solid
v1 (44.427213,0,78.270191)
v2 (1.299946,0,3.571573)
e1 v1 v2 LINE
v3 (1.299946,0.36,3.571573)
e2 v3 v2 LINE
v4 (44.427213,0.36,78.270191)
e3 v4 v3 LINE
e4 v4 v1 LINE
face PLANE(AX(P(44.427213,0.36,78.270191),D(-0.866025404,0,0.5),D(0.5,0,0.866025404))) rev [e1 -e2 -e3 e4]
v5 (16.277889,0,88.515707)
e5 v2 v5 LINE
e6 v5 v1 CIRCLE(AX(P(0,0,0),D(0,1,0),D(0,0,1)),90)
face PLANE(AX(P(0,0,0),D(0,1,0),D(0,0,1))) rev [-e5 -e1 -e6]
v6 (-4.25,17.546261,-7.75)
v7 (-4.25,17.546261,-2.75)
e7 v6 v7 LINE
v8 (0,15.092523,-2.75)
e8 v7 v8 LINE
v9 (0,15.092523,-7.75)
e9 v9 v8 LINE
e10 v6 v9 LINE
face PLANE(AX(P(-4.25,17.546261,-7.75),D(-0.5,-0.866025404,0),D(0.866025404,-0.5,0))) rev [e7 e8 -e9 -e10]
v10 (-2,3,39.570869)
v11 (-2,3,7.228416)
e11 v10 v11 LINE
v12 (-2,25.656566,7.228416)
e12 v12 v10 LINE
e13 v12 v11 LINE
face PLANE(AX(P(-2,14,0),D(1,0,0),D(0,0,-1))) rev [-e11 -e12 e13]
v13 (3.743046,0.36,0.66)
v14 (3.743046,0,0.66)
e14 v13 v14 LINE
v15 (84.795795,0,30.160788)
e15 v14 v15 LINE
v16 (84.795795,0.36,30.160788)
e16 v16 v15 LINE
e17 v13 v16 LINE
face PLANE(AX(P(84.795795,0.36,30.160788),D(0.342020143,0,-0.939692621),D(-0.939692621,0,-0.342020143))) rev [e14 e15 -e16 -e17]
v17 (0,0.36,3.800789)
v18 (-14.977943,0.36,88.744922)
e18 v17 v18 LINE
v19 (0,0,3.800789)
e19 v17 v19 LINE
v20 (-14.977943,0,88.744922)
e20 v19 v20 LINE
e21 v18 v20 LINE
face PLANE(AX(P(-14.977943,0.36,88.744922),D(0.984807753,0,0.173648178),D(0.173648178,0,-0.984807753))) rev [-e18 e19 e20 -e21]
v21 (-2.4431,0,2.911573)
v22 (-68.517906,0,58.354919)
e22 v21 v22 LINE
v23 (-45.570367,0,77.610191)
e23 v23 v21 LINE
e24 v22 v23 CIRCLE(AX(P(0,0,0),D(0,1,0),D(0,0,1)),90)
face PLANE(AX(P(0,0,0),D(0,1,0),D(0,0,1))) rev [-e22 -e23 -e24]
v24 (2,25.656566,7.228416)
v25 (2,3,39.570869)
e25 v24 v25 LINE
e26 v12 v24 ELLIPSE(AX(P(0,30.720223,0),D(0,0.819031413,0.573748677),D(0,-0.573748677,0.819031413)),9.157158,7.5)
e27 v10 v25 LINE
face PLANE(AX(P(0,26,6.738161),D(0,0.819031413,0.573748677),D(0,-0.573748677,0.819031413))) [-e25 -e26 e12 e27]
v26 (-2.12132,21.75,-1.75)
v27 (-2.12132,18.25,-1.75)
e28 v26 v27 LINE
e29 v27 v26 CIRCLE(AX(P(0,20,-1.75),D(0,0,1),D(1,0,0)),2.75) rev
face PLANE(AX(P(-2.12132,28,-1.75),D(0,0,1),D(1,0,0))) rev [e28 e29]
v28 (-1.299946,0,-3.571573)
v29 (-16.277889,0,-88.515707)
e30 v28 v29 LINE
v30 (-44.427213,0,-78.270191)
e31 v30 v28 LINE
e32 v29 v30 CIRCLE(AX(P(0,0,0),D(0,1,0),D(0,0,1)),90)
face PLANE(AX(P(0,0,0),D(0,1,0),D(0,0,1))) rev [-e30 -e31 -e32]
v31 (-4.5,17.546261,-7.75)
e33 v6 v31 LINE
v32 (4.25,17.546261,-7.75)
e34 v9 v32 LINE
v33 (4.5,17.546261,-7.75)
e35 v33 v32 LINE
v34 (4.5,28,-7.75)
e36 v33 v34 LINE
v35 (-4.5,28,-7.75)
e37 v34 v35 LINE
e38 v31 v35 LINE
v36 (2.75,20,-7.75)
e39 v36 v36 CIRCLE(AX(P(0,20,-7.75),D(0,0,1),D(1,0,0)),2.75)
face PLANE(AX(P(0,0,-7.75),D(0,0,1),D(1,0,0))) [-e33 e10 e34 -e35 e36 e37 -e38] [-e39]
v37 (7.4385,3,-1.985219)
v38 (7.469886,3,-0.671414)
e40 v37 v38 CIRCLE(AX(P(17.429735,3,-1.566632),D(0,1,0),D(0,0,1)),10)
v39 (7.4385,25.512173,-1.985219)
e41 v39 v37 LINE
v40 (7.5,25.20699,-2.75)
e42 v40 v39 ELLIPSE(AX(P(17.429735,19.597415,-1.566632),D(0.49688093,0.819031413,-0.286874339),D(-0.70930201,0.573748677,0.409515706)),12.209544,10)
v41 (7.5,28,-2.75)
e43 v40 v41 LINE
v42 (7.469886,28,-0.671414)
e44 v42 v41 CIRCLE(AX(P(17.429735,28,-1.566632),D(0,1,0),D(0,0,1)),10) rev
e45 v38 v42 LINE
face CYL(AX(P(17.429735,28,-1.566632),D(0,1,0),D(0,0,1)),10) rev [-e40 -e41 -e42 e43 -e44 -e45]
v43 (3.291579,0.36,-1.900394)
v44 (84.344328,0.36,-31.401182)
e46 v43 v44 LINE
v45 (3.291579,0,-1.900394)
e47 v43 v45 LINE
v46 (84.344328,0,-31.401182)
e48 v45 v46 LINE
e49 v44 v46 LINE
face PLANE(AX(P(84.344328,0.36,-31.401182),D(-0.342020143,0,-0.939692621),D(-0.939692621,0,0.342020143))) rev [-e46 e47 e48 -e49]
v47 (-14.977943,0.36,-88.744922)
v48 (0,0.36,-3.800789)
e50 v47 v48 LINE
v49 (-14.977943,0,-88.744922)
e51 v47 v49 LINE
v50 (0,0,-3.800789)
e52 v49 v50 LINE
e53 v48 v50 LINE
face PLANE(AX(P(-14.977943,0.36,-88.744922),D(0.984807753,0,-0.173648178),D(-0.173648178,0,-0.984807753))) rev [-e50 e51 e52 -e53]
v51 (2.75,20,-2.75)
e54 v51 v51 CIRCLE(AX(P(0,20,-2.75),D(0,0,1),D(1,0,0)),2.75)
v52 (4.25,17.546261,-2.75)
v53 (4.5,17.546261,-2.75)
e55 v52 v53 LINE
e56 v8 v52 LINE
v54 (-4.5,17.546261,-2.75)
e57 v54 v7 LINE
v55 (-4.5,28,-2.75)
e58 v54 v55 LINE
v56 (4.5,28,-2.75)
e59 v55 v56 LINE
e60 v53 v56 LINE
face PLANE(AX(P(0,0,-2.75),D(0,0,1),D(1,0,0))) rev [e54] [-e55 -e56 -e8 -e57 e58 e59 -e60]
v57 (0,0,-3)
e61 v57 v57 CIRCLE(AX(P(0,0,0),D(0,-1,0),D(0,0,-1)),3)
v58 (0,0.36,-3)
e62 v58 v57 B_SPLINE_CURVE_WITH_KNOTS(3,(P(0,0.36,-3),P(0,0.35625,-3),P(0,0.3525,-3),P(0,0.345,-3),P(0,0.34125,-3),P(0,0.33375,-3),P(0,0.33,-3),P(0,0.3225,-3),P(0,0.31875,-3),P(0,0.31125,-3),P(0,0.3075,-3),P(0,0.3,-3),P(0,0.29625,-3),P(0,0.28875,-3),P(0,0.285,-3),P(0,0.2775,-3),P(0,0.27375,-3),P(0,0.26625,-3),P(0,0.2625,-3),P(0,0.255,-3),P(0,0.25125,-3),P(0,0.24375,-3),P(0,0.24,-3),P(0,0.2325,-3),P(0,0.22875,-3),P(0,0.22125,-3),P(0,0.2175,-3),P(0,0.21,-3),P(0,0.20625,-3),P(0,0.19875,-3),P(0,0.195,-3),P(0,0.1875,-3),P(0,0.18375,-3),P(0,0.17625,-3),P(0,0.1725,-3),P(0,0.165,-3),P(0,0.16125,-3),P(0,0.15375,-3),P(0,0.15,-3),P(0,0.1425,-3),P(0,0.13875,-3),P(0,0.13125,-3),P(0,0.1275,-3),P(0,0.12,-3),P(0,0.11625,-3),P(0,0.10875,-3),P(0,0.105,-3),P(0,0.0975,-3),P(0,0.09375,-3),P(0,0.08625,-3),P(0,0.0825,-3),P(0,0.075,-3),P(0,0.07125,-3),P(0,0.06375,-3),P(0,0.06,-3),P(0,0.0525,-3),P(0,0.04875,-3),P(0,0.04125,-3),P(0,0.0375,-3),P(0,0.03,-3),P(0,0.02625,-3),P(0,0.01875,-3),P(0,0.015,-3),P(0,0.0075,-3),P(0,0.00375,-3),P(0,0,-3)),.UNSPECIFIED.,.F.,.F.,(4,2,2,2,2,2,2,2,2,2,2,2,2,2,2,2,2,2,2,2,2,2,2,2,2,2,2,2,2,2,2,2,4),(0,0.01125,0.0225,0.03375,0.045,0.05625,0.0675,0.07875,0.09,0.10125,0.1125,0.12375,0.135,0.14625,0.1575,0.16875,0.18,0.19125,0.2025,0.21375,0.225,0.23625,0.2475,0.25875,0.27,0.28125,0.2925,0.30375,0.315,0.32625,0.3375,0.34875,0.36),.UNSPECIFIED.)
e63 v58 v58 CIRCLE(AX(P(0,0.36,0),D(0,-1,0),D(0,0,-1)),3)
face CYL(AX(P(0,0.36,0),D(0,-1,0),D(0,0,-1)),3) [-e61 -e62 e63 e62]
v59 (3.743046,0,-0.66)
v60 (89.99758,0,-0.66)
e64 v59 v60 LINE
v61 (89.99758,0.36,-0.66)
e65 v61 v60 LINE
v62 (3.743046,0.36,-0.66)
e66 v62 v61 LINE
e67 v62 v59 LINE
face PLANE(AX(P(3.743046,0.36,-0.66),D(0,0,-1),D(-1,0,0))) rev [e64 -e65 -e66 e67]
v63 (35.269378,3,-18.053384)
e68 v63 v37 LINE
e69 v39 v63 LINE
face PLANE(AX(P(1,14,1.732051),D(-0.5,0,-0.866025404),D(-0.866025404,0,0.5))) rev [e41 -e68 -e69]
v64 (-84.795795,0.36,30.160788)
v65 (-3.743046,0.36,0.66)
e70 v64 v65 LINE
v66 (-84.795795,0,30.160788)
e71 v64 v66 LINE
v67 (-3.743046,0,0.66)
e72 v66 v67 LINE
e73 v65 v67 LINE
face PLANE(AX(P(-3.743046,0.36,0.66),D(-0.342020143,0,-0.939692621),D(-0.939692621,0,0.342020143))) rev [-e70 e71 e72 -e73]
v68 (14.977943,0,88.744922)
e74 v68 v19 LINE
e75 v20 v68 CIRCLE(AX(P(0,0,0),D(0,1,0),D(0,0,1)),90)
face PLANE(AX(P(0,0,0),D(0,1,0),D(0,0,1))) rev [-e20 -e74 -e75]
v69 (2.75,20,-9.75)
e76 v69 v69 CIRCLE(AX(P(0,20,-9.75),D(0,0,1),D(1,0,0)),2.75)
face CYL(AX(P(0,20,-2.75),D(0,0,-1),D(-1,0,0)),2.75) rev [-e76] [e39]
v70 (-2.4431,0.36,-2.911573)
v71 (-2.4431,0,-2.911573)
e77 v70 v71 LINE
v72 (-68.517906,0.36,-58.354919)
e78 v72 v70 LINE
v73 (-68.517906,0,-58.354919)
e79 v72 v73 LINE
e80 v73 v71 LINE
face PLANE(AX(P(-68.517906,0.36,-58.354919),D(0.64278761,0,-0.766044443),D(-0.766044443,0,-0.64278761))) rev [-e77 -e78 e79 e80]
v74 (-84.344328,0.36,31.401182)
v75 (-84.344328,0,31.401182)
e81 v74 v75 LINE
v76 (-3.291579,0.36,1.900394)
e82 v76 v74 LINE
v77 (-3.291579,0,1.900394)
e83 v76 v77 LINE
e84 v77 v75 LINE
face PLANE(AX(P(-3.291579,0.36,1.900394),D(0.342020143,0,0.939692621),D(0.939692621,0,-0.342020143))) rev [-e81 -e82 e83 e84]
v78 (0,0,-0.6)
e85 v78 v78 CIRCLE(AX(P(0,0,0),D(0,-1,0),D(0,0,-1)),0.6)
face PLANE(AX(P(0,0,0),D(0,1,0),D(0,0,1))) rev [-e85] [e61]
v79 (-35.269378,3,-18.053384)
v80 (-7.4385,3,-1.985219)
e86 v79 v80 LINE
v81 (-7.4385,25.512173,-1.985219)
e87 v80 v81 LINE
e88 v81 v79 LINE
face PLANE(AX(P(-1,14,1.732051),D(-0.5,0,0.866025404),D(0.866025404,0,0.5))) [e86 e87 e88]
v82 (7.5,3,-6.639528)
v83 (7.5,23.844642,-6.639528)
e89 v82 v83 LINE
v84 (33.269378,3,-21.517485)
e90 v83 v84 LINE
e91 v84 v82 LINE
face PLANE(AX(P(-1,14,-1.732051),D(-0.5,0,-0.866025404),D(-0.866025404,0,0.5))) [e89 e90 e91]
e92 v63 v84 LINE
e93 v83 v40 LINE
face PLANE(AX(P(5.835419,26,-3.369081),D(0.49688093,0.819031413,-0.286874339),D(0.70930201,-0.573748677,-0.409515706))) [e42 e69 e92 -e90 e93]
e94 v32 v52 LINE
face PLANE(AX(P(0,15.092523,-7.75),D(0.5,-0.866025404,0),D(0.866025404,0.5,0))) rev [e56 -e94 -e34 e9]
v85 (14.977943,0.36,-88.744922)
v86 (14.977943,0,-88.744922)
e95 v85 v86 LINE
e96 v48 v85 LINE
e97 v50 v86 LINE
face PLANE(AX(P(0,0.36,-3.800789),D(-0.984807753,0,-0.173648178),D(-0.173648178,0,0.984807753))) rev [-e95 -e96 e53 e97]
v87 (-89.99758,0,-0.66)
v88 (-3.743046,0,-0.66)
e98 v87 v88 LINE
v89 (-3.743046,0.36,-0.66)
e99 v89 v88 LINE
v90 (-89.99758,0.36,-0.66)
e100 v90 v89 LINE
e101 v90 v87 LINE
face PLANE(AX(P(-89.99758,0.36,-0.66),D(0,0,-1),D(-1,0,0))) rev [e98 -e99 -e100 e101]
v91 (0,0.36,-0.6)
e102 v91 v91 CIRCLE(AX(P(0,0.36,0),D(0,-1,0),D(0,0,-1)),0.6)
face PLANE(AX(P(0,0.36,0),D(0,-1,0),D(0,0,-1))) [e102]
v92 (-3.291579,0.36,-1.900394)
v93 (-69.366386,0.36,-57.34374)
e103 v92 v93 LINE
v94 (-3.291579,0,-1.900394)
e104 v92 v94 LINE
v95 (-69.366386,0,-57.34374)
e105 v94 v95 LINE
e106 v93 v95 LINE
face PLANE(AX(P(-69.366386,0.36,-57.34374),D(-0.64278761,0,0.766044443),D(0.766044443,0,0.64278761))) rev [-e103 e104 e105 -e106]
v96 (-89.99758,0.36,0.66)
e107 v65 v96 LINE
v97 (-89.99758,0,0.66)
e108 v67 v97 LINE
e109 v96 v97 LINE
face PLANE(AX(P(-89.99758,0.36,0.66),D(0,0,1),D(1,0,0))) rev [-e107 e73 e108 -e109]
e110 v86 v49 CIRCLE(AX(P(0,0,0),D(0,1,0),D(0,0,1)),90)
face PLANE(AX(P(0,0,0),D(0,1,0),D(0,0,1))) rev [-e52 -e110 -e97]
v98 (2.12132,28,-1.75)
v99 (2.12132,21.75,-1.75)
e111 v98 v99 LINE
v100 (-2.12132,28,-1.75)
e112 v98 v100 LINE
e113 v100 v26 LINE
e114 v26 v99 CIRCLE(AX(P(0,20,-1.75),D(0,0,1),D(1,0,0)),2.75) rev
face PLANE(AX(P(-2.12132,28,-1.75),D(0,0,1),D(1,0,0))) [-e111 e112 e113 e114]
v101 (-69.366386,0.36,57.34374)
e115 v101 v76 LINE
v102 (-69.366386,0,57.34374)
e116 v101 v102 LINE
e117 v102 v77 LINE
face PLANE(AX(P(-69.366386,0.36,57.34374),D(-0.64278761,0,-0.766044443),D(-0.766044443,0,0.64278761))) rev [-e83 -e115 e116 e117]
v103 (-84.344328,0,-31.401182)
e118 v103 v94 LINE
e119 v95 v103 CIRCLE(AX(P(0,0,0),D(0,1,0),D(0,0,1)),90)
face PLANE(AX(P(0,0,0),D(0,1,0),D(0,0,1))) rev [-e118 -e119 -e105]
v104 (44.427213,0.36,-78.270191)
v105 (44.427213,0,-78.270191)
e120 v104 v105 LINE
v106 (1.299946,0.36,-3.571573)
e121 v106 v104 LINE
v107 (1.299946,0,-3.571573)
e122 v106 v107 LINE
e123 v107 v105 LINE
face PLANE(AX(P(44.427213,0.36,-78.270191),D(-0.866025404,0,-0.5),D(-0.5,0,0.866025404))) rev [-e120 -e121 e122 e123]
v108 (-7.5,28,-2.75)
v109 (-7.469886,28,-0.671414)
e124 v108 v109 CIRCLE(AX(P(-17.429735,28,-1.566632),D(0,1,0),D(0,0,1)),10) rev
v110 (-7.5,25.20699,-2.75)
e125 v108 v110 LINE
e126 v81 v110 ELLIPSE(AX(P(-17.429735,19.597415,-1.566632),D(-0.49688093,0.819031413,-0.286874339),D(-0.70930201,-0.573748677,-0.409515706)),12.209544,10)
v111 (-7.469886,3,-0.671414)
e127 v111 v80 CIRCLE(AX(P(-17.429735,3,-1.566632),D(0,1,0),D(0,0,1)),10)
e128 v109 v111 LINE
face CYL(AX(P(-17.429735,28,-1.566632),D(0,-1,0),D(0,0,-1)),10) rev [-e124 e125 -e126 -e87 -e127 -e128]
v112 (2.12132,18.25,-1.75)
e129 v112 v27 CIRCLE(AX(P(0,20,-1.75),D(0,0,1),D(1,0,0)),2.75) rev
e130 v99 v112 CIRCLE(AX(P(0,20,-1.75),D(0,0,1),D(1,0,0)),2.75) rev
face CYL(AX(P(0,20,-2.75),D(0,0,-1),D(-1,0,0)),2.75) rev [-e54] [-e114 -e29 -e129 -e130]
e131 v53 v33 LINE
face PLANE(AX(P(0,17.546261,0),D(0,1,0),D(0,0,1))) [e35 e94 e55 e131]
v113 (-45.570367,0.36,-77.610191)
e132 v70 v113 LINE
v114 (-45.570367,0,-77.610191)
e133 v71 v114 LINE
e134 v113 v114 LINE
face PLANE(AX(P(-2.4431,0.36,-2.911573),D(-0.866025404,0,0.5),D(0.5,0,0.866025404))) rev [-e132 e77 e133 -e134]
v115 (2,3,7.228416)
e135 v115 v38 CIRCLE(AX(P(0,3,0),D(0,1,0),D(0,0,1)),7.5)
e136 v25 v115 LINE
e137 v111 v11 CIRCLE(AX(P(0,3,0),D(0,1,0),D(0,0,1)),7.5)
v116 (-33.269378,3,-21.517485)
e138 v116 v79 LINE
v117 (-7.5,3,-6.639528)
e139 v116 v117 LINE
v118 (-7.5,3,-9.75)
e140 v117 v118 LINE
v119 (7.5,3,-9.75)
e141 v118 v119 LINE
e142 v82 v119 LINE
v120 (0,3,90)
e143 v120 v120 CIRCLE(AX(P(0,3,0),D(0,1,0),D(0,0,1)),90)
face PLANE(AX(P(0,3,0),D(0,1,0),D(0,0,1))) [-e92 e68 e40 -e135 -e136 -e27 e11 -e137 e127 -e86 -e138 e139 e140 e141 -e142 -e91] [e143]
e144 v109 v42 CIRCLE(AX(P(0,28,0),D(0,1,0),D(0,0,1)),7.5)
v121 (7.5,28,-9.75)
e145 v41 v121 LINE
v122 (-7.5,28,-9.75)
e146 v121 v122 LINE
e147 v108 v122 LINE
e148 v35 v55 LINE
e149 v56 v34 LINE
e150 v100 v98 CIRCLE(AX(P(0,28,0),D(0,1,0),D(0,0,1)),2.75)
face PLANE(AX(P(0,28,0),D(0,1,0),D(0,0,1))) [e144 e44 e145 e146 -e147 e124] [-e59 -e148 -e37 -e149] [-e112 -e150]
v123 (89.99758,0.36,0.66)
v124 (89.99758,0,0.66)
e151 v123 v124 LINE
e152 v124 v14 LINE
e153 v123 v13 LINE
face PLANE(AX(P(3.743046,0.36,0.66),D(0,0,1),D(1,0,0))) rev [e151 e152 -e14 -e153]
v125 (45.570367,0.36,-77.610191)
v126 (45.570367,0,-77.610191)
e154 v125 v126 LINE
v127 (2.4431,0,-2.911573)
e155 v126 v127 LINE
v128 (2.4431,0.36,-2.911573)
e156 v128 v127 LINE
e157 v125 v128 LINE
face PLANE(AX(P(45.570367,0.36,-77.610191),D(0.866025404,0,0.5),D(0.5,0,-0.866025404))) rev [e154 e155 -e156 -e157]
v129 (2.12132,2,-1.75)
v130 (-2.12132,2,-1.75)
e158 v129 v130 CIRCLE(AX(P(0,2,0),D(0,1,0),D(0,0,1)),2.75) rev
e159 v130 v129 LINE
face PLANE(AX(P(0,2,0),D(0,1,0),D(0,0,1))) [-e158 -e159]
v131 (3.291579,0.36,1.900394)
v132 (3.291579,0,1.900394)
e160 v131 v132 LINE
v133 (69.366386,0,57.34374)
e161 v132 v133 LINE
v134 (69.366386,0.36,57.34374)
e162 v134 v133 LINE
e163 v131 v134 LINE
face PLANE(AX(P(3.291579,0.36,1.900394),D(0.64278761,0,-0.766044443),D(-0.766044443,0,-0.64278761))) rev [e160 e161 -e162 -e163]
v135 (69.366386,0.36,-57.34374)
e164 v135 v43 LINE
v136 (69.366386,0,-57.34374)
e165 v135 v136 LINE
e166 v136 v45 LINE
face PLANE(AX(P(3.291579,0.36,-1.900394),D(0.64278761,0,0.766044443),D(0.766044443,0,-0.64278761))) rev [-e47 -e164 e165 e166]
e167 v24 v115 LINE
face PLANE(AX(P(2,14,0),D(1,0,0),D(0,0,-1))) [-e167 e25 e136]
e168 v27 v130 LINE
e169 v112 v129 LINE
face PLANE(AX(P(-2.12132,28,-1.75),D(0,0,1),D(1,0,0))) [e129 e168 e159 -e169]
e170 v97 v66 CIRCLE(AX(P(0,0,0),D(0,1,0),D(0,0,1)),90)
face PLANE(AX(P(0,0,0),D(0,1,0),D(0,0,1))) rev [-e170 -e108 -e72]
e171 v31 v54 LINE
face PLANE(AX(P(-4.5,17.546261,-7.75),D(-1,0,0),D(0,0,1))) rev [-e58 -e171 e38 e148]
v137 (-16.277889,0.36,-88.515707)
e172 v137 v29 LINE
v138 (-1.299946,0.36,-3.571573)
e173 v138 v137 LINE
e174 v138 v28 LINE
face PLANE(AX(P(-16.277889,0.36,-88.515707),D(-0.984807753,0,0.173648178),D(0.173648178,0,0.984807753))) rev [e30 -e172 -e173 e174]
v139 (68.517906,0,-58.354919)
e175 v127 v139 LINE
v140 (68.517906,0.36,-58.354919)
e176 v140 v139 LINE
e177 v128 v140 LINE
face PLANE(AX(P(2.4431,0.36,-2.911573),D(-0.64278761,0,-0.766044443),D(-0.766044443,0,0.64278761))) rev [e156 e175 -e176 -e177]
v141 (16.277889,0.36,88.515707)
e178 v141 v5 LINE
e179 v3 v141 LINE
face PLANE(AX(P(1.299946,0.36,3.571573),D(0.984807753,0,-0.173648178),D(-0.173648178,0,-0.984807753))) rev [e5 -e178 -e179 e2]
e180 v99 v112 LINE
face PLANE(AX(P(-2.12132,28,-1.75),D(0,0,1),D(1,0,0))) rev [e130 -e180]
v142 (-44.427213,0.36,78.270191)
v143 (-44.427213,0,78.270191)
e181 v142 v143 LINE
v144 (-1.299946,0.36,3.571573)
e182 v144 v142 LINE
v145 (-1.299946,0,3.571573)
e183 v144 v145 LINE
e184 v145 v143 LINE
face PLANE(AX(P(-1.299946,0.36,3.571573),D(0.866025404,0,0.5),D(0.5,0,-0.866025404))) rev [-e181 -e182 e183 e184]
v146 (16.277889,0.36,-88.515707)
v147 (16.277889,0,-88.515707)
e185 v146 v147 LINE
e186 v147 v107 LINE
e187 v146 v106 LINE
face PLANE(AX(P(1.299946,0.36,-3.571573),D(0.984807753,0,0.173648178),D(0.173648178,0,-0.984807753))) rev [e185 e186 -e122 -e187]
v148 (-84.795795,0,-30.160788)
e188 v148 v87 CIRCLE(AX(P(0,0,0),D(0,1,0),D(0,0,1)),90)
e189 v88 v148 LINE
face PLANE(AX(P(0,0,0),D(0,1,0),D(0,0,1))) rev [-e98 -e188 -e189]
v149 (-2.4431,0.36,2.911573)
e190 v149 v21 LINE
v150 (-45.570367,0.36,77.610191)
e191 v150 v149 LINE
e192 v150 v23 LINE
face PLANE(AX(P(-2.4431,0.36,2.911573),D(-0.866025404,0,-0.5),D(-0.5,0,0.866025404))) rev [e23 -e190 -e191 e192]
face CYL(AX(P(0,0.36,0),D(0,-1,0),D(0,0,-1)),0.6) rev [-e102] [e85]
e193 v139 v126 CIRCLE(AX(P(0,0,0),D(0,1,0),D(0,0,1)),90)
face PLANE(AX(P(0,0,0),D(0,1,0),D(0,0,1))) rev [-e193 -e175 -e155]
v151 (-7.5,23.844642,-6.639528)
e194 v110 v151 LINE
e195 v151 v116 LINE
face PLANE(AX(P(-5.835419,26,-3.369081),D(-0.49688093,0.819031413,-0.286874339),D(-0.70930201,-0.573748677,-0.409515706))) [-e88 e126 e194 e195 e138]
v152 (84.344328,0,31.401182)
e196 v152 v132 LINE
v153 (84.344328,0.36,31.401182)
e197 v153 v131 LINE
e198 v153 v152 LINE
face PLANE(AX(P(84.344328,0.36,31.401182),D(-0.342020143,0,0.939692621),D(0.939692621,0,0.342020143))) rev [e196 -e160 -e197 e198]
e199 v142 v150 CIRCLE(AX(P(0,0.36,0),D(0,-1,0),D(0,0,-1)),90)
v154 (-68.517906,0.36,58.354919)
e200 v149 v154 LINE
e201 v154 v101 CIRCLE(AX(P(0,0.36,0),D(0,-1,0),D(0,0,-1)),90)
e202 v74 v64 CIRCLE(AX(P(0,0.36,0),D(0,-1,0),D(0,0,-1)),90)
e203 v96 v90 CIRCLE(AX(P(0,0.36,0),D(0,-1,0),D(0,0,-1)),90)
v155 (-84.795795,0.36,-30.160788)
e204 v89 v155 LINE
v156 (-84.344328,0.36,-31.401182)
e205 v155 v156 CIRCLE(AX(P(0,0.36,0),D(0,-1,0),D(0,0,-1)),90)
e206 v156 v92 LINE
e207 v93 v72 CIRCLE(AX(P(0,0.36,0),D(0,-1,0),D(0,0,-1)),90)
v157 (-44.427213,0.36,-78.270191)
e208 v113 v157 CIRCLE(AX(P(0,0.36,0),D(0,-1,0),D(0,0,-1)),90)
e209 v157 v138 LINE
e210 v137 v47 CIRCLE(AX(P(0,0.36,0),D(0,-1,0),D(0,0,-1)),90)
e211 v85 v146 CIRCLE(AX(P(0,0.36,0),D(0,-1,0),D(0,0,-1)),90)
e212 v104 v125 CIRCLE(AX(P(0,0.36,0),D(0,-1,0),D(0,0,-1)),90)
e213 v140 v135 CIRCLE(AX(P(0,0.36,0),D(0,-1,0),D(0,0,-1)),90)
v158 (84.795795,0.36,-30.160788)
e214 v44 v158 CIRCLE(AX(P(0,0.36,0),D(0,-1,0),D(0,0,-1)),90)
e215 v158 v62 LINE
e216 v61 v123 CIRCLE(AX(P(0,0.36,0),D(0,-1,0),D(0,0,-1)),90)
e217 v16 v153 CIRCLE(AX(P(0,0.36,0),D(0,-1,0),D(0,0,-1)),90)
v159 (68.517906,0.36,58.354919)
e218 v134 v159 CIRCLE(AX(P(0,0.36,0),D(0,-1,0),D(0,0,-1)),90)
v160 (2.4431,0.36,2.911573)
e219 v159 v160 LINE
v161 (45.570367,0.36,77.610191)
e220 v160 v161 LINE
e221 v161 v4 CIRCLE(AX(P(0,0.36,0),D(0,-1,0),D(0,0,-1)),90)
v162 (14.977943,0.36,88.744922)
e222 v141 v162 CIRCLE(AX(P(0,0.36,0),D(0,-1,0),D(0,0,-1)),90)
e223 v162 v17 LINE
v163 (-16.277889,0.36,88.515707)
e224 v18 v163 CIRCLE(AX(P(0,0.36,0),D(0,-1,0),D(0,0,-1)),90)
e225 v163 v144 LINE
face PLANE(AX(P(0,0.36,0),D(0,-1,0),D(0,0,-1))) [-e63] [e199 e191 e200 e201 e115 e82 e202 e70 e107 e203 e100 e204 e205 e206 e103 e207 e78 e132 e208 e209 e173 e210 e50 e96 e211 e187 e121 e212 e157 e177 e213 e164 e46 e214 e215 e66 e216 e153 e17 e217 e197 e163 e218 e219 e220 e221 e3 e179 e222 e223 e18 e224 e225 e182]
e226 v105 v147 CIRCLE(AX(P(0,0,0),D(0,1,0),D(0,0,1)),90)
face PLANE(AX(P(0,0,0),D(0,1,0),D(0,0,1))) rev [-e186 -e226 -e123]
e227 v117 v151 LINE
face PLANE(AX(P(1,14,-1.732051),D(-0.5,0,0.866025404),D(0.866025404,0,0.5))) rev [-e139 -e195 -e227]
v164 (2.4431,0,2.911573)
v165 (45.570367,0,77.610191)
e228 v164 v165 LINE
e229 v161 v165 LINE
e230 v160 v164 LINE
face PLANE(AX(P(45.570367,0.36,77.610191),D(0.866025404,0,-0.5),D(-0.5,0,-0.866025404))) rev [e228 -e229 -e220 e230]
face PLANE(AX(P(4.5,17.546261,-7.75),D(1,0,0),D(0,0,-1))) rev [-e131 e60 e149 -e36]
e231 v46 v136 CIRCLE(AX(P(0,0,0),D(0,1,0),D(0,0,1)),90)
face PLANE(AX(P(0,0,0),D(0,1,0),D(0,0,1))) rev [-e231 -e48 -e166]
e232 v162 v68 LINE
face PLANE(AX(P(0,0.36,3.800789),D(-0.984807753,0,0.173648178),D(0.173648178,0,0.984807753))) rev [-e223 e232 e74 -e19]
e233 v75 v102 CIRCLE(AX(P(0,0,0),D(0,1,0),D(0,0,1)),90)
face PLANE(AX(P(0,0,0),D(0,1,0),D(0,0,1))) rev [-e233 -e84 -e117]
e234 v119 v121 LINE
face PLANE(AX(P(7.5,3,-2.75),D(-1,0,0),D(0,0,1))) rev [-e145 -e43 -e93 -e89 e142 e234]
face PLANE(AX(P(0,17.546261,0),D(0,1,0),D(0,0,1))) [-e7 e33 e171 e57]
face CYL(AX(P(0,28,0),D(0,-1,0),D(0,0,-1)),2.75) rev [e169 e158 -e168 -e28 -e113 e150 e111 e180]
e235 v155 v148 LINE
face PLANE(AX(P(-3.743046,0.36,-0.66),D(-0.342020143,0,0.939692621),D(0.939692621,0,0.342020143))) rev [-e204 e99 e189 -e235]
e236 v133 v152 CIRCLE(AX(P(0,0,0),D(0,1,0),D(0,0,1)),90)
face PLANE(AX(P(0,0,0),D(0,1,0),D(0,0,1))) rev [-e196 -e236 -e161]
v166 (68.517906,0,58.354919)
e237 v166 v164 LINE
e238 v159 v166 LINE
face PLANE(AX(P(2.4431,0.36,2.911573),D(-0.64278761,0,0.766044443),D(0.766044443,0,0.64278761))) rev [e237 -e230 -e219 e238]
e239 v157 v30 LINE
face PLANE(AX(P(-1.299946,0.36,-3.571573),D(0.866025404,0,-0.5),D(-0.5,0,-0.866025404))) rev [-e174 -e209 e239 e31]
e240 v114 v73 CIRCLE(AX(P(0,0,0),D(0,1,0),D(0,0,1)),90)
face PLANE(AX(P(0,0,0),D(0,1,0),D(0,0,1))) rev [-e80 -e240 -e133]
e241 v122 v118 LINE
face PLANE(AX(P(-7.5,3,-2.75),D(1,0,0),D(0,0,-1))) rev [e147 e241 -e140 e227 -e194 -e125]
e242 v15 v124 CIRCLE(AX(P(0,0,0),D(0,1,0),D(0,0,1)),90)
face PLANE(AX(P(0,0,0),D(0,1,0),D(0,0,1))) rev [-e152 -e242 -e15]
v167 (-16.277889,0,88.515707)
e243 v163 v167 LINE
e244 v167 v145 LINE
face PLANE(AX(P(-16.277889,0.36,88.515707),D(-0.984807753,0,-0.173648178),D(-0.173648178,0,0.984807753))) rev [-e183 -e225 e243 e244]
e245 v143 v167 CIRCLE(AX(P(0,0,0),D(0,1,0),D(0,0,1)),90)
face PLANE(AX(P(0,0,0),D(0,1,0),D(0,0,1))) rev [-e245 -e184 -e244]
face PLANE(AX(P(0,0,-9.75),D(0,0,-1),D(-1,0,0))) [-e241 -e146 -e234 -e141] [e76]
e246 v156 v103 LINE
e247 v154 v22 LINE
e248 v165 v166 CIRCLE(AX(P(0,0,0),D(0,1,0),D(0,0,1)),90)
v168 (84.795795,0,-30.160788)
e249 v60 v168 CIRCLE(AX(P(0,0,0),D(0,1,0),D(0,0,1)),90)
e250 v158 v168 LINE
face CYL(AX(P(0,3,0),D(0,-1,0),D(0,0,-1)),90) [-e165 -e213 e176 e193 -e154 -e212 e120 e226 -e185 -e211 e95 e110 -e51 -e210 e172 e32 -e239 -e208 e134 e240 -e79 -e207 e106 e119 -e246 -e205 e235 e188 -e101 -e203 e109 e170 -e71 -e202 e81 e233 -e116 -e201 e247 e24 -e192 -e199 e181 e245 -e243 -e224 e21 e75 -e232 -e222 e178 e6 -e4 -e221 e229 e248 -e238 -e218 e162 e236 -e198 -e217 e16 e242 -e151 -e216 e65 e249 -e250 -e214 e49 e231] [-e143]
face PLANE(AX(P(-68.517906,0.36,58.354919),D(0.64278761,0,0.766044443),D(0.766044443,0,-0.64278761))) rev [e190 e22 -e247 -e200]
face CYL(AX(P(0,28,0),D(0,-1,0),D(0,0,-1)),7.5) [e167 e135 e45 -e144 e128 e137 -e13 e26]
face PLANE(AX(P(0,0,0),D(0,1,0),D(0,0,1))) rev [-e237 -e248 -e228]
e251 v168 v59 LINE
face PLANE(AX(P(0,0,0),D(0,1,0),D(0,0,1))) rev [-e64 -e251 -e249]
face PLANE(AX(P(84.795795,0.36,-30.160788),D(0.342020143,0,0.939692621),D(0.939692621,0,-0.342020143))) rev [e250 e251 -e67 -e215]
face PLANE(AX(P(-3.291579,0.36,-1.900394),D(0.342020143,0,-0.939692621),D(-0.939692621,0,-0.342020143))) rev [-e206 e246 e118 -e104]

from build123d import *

# Parameters (mm, degrees)
SKETCH1_R                = 90
BOSS_EXTRUDE1_DEPTH      = 3
SKETCH2_R                = 7.5
BOSS_EXTRUDE2_DEPTH      = 25
RIB5_REACH               = 132.323
SKETCH3_WALL_W           = 306.218438134
SKETCH3_WALL_H           = 4
CIRPATTERN1_COUNT        = 3
BOSS_EXTRUDE3_DEPTH      = 4
BOSS_EXTRUDE3_DEPTH_BACK = 3
BOSS_EXTRUDE3_START      = -5
SKETCH5_W                = 15
SKETCH5_H                = 25
SKETCH5_R                = 2.75
CUT_EXTRUDE3_DEPTH       = 130.711217711
CUT_EXTRUDE3_DEPTH_BACK  = 1
SKETCH8_R                = 2.75
CUT_EXTRUDE4_DEPTH       = 8
CUT_EXTRUDE1_START       = -1
CUT_EXTRUDE1_DEPTH       = 5
SKETCH9_W                = 11.211365442
SKETCH9_H                = 11.7257459
SKETCH9_R                = 2.75
BOSS_EXTRUDE4_DEPTH      = 2
SKETCH10_W               = 9
SKETCH10_H               = 5
CUT_EXTRUDE5_DEPTH       = 10.453739
FILLET1_START            = 2
FILLET1_DEPTH            = 26
SKETCH11_R               = 3
CUT_EXTRUDE6_DEPTH       = 0.36
SKETCH12_R               = 0.6
CUT_EXTRUDE7_DEPTH       = 0.36


with BuildPart() as part:
    # Sketch1 → Boss-Extrude1 (new body)
    with BuildSketch(Plane(origin=(0, 0, 0), x_dir=(1, 0, 0), z_dir=(0, 1, 0))):
        with Locations(Location((0, 0, 0), (0, 0, 270))):
            Circle(SKETCH1_R)
    extrude(amount=BOSS_EXTRUDE1_DEPTH)

    # Sketch2 → Boss-Extrude2 (add)
    with BuildSketch(Plane(origin=(0, 3, 0), x_dir=(1, 0, 0), z_dir=(0, 1, 0))):
        with Locations(Location((0, 0, 0), (0, 0, 270))):
            Circle(SKETCH2_R)
        with BuildLine():
            Line((-2.121320344, 1.75), (2.121320344, 1.75))
            ThreePointArc((2.121320344, 1.75), (0, -2.75), (-2.121320344, 1.75))
        make_face(mode=Mode.SUBTRACT)
    extrude(amount=BOSS_EXTRUDE2_DEPTH)

    # Sketch3 wall → Rib5 (add, up to next)
    with BuildSketch(Plane(origin=(0, 13.5, 24.582023983), x_dir=(0, -0.573748677161, 0.819031412985), z_dir=(0, -0.819031412985, -0.573748677161)), mode=Mode.PRIVATE) as rib5_sk1:
        Rectangle(SKETCH3_WALL_W, SKETCH3_WALL_H)
    rib5_tool1 = extrude(rib5_sk1.sketch, amount=RIB5_REACH, mode=Mode.PRIVATE) - part.part
    rib5 = rib5_tool1.solids().sort_by_distance((0, 13.5, 24.582023983))[0]
    add(rib5)

    # CirPattern1: Rib5 ×3 about axis
    cirpattern1_axis = Axis((0, 0, 0), (0, 1, 0))
    for i in range(1, CIRPATTERN1_COUNT):
        add(rib5.rotate(cirpattern1_axis, i * 360 / CIRPATTERN1_COUNT))

    # Sketch5 → Boss-Extrude3 (add, two sides: drawn at the far end of the back side and taken through both)
    with BuildSketch(Plane.XY.offset(-1.75).offset(BOSS_EXTRUDE3_START - BOSS_EXTRUDE3_DEPTH_BACK)):
        with Locations((0, 15.5)):
            Rectangle(SKETCH5_W, SKETCH5_H)
        with Locations(Location((0, 20, 0), (0, 0, 90))):
            Circle(SKETCH5_R, mode=Mode.SUBTRACT)
    extrude(amount=BOSS_EXTRUDE3_DEPTH + BOSS_EXTRUDE3_DEPTH_BACK)

    # Sketch7 → Cut-Extrude3 (cut, two sides: drawn at the far end of the back side and taken through both)
    with BuildSketch(Plane(origin=(0, 3, 0), x_dir=(1, 0, 0), z_dir=(0, 1, 0)).offset(-CUT_EXTRUDE3_DEPTH_BACK)):
        with BuildLine():
            Line((-2.121320344, 1.75), (2.121320344, 1.75))
            ThreePointArc((2.121320344, 1.75), (0, -2.75), (-2.121320344, 1.75))
        make_face()
    extrude(amount=CUT_EXTRUDE3_DEPTH + CUT_EXTRUDE3_DEPTH_BACK, mode=Mode.SUBTRACT)

    # Sketch8 → Cut-Extrude4 (cut)
    with BuildSketch(Plane(origin=(0, 0, -9.75), x_dir=(-1, 0, 0), z_dir=(0, 0, -1))):
        with Locations(Location((0, 20, 0), (0, 0, 39.521196359))):
            Circle(SKETCH8_R)
    extrude(amount=-CUT_EXTRUDE4_DEPTH, mode=Mode.SUBTRACT)

    # Sketch4 → Cut-Extrude1 (cut)
    with BuildSketch(Plane.XY.offset(-1.75).offset(CUT_EXTRUDE1_START)):
        Polygon((0, 24.907477288), (-4.25, 22.453738644), (-4.25, 17.546261356), (0, 15.092522712), (4.25, 17.546261356), (4.25, 22.453738644), align=None)
    extrude(amount=-CUT_EXTRUDE1_DEPTH, mode=Mode.SUBTRACT)

    # Sketch9 → Boss-Extrude4 (add)
    with BuildSketch(Plane(origin=(0, 0, -9.75), x_dir=(-1, 0, 0), z_dir=(0, 0, -1))):
        with Locations((0, 20)):
            Rectangle(SKETCH9_W, SKETCH9_H)
        with Locations(Location((0, 20, 0), (0, 0, 180))):
            Circle(SKETCH9_R, mode=Mode.SUBTRACT)
    extrude(amount=-BOSS_EXTRUDE4_DEPTH)

    # Sketch10 → Cut-Extrude5 (cut)
    with BuildSketch(Plane(origin=(0, 28, 0), x_dir=(1, 0, 0), z_dir=(0, 1, 0))):
        with Locations((0, 5.25)):
            Rectangle(SKETCH10_W, SKETCH10_H)
    extrude(amount=-CUT_EXTRUDE5_DEPTH, mode=Mode.SUBTRACT)

    # Fillet1: read off the stored shape, not the designer's step
    # Fillet1 outline → Fillet1 (add)
    with BuildSketch(Plane(origin=(0, 0, 0), x_dir=(1, 0, 0), z_dir=(0, 1, 0)).offset(FILLET1_START)):
        with BuildLine():
            ThreePointArc((-7.46988647, 0.671413522), (-7.29814404, 1.728321024), (-6.977642868, 2.75))
            Line((-6.977642868, 2.75), (-7.5, 2.75))
            ThreePointArc((-7.5, 2.75), (-7.430784372, 1.711491388), (-7.46988647, 0.671413522))
        make_face()
        with BuildLine():
            Line((7.5, 2.75), (6.977642868, 2.75))
            ThreePointArc((6.977642868, 2.75), (7.29814404, 1.728321024), (7.46988647, 0.671413522))
            ThreePointArc((7.46988647, 0.671413522), (7.430784372, 1.711491388), (7.5, 2.75))
        make_face()
    extrude(amount=FILLET1_DEPTH)

    # Sketch11 → Cut-Extrude6 (cut)
    with BuildSketch(Plane.XZ):
        with BuildLine():
            Line((-89.997579967, 0.66), (-3.743046001, 0.66))
            Line((-3.743046001, 0.66), (-84.795795079, 30.16078807))
            ThreePointArc((-84.795795079, 30.16078807), (-84.572335871, 30.781812899), (-84.344328489, 31.401182329))
            Line((-84.344328489, 31.401182329), (-3.291579412, 1.900394259))
            Line((-3.291579412, 1.900394259), (-69.366385851, 57.343739972))
            ThreePointArc((-69.366385851, 57.343739972), (-68.943999881, 57.850884872), (-68.517906206, 58.354918637))
            Line((-68.517906206, 58.354918637), (-2.443099767, 2.911572924))
            Line((-2.443099767, 2.911572924), (-45.57036675, 77.610190531))
            ThreePointArc((-45.57036675, 77.610190531), (-45, 77.942286341), (-44.427213217, 78.270190531))
            Line((-44.427213217, 78.270190531), (-1.299946234, 3.571572924))
            Line((-1.299946234, 3.571572924), (-16.277888873, 88.515706707))
            ThreePointArc((-16.277888873, 88.515706707), (-15.62833599, 88.632697771), (-14.977942639, 88.744922302))
            Line((-14.977942639, 88.744922302), (0, 3.800788519))
            Line((0, 3.800788519), (14.977942639, 88.744922302))
            ThreePointArc((14.977942639, 88.744922302), (15.62833599, 88.632697771), (16.277888873, 88.515706707))
            Line((16.277888873, 88.515706707), (1.299946234, 3.571572924))
            Line((1.299946234, 3.571572924), (44.427213217, 78.270190531))
            ThreePointArc((44.427213217, 78.270190531), (45, 77.942286341), (45.57036675, 77.610190531))
            Line((45.57036675, 77.610190531), (2.443099767, 2.911572924))
            Line((2.443099767, 2.911572924), (68.517906206, 58.354918637))
            ThreePointArc((68.517906206, 58.354918637), (68.943999881, 57.850884872), (69.366385851, 57.343739972))
            Line((69.366385851, 57.343739972), (3.291579412, 1.900394259))
            Line((3.291579412, 1.900394259), (84.344328489, 31.401182329))
            ThreePointArc((84.344328489, 31.401182329), (84.572335871, 30.781812899), (84.795795079, 30.16078807))
            Line((84.795795079, 30.16078807), (3.743046001, 0.66))
            Line((3.743046001, 0.66), (89.997579967, 0.66))
            ThreePointArc((89.997579967, 0.66), (90, 0), (89.997579967, -0.66))
            Line((89.997579967, -0.66), (3.743046001, -0.66))
            Line((3.743046001, -0.66), (84.795795079, -30.16078807))
            ThreePointArc((84.795795079, -30.16078807), (84.572335871, -30.781812899), (84.344328489, -31.401182329))
            Line((84.344328489, -31.401182329), (3.291579412, -1.900394259))
            Line((3.291579412, -1.900394259), (69.366385851, -57.343739972))
            ThreePointArc((69.366385851, -57.343739972), (68.943999881, -57.850884872), (68.517906206, -58.354918637))
            Line((68.517906206, -58.354918637), (2.443099767, -2.911572924))
            Line((2.443099767, -2.911572924), (45.57036675, -77.610190531))
            ThreePointArc((45.57036675, -77.610190531), (45, -77.942286341), (44.427213217, -78.270190531))
            Line((44.427213217, -78.270190531), (1.299946234, -3.571572924))
            Line((1.299946234, -3.571572924), (16.277888873, -88.515706707))
            ThreePointArc((16.277888873, -88.515706707), (15.62833599, -88.632697771), (14.977942639, -88.744922302))
            Line((14.977942639, -88.744922302), (0, -3.800788519))
            Line((0, -3.800788519), (-14.977942639, -88.744922302))
            ThreePointArc((-14.977942639, -88.744922302), (-15.62833599, -88.632697771), (-16.277888873, -88.515706707))
            Line((-16.277888873, -88.515706707), (-1.299946234, -3.571572924))
            Line((-1.299946234, -3.571572924), (-44.427213217, -78.270190531))
            ThreePointArc((-44.427213217, -78.270190531), (-45, -77.942286341), (-45.57036675, -77.610190531))
            Line((-45.57036675, -77.610190531), (-2.443099767, -2.911572924))
            Line((-2.443099767, -2.911572924), (-68.517906206, -58.354918637))
            ThreePointArc((-68.517906206, -58.354918637), (-68.943999881, -57.850884872), (-69.366385851, -57.343739972))
            Line((-69.366385851, -57.343739972), (-3.291579412, -1.900394259))
            Line((-3.291579412, -1.900394259), (-84.344328489, -31.401182329))
            ThreePointArc((-84.344328489, -31.401182329), (-84.572335871, -30.781812899), (-84.795795079, -30.16078807))
            Line((-84.795795079, -30.16078807), (-3.743046001, -0.66))
            Line((-3.743046001, -0.66), (-89.997579967, -0.66))
            ThreePointArc((-89.997579967, -0.66), (-90, 0), (-89.997579967, 0.66))
        make_face()
        with Locations(Location((0, 0, 0), (0, 0, 270))):
            Circle(SKETCH11_R, mode=Mode.SUBTRACT)
    extrude(amount=-CUT_EXTRUDE6_DEPTH, mode=Mode.SUBTRACT)

    # Sketch12 → Cut-Extrude7 (cut)
    with BuildSketch(Plane.XZ):
        with Locations(Location((0, 0, 0), (0, 0, 270))):
            Circle(SKETCH12_R)
    extrude(amount=-CUT_EXTRUDE7_DEPTH, mode=Mode.SUBTRACT)


solid = part.part
